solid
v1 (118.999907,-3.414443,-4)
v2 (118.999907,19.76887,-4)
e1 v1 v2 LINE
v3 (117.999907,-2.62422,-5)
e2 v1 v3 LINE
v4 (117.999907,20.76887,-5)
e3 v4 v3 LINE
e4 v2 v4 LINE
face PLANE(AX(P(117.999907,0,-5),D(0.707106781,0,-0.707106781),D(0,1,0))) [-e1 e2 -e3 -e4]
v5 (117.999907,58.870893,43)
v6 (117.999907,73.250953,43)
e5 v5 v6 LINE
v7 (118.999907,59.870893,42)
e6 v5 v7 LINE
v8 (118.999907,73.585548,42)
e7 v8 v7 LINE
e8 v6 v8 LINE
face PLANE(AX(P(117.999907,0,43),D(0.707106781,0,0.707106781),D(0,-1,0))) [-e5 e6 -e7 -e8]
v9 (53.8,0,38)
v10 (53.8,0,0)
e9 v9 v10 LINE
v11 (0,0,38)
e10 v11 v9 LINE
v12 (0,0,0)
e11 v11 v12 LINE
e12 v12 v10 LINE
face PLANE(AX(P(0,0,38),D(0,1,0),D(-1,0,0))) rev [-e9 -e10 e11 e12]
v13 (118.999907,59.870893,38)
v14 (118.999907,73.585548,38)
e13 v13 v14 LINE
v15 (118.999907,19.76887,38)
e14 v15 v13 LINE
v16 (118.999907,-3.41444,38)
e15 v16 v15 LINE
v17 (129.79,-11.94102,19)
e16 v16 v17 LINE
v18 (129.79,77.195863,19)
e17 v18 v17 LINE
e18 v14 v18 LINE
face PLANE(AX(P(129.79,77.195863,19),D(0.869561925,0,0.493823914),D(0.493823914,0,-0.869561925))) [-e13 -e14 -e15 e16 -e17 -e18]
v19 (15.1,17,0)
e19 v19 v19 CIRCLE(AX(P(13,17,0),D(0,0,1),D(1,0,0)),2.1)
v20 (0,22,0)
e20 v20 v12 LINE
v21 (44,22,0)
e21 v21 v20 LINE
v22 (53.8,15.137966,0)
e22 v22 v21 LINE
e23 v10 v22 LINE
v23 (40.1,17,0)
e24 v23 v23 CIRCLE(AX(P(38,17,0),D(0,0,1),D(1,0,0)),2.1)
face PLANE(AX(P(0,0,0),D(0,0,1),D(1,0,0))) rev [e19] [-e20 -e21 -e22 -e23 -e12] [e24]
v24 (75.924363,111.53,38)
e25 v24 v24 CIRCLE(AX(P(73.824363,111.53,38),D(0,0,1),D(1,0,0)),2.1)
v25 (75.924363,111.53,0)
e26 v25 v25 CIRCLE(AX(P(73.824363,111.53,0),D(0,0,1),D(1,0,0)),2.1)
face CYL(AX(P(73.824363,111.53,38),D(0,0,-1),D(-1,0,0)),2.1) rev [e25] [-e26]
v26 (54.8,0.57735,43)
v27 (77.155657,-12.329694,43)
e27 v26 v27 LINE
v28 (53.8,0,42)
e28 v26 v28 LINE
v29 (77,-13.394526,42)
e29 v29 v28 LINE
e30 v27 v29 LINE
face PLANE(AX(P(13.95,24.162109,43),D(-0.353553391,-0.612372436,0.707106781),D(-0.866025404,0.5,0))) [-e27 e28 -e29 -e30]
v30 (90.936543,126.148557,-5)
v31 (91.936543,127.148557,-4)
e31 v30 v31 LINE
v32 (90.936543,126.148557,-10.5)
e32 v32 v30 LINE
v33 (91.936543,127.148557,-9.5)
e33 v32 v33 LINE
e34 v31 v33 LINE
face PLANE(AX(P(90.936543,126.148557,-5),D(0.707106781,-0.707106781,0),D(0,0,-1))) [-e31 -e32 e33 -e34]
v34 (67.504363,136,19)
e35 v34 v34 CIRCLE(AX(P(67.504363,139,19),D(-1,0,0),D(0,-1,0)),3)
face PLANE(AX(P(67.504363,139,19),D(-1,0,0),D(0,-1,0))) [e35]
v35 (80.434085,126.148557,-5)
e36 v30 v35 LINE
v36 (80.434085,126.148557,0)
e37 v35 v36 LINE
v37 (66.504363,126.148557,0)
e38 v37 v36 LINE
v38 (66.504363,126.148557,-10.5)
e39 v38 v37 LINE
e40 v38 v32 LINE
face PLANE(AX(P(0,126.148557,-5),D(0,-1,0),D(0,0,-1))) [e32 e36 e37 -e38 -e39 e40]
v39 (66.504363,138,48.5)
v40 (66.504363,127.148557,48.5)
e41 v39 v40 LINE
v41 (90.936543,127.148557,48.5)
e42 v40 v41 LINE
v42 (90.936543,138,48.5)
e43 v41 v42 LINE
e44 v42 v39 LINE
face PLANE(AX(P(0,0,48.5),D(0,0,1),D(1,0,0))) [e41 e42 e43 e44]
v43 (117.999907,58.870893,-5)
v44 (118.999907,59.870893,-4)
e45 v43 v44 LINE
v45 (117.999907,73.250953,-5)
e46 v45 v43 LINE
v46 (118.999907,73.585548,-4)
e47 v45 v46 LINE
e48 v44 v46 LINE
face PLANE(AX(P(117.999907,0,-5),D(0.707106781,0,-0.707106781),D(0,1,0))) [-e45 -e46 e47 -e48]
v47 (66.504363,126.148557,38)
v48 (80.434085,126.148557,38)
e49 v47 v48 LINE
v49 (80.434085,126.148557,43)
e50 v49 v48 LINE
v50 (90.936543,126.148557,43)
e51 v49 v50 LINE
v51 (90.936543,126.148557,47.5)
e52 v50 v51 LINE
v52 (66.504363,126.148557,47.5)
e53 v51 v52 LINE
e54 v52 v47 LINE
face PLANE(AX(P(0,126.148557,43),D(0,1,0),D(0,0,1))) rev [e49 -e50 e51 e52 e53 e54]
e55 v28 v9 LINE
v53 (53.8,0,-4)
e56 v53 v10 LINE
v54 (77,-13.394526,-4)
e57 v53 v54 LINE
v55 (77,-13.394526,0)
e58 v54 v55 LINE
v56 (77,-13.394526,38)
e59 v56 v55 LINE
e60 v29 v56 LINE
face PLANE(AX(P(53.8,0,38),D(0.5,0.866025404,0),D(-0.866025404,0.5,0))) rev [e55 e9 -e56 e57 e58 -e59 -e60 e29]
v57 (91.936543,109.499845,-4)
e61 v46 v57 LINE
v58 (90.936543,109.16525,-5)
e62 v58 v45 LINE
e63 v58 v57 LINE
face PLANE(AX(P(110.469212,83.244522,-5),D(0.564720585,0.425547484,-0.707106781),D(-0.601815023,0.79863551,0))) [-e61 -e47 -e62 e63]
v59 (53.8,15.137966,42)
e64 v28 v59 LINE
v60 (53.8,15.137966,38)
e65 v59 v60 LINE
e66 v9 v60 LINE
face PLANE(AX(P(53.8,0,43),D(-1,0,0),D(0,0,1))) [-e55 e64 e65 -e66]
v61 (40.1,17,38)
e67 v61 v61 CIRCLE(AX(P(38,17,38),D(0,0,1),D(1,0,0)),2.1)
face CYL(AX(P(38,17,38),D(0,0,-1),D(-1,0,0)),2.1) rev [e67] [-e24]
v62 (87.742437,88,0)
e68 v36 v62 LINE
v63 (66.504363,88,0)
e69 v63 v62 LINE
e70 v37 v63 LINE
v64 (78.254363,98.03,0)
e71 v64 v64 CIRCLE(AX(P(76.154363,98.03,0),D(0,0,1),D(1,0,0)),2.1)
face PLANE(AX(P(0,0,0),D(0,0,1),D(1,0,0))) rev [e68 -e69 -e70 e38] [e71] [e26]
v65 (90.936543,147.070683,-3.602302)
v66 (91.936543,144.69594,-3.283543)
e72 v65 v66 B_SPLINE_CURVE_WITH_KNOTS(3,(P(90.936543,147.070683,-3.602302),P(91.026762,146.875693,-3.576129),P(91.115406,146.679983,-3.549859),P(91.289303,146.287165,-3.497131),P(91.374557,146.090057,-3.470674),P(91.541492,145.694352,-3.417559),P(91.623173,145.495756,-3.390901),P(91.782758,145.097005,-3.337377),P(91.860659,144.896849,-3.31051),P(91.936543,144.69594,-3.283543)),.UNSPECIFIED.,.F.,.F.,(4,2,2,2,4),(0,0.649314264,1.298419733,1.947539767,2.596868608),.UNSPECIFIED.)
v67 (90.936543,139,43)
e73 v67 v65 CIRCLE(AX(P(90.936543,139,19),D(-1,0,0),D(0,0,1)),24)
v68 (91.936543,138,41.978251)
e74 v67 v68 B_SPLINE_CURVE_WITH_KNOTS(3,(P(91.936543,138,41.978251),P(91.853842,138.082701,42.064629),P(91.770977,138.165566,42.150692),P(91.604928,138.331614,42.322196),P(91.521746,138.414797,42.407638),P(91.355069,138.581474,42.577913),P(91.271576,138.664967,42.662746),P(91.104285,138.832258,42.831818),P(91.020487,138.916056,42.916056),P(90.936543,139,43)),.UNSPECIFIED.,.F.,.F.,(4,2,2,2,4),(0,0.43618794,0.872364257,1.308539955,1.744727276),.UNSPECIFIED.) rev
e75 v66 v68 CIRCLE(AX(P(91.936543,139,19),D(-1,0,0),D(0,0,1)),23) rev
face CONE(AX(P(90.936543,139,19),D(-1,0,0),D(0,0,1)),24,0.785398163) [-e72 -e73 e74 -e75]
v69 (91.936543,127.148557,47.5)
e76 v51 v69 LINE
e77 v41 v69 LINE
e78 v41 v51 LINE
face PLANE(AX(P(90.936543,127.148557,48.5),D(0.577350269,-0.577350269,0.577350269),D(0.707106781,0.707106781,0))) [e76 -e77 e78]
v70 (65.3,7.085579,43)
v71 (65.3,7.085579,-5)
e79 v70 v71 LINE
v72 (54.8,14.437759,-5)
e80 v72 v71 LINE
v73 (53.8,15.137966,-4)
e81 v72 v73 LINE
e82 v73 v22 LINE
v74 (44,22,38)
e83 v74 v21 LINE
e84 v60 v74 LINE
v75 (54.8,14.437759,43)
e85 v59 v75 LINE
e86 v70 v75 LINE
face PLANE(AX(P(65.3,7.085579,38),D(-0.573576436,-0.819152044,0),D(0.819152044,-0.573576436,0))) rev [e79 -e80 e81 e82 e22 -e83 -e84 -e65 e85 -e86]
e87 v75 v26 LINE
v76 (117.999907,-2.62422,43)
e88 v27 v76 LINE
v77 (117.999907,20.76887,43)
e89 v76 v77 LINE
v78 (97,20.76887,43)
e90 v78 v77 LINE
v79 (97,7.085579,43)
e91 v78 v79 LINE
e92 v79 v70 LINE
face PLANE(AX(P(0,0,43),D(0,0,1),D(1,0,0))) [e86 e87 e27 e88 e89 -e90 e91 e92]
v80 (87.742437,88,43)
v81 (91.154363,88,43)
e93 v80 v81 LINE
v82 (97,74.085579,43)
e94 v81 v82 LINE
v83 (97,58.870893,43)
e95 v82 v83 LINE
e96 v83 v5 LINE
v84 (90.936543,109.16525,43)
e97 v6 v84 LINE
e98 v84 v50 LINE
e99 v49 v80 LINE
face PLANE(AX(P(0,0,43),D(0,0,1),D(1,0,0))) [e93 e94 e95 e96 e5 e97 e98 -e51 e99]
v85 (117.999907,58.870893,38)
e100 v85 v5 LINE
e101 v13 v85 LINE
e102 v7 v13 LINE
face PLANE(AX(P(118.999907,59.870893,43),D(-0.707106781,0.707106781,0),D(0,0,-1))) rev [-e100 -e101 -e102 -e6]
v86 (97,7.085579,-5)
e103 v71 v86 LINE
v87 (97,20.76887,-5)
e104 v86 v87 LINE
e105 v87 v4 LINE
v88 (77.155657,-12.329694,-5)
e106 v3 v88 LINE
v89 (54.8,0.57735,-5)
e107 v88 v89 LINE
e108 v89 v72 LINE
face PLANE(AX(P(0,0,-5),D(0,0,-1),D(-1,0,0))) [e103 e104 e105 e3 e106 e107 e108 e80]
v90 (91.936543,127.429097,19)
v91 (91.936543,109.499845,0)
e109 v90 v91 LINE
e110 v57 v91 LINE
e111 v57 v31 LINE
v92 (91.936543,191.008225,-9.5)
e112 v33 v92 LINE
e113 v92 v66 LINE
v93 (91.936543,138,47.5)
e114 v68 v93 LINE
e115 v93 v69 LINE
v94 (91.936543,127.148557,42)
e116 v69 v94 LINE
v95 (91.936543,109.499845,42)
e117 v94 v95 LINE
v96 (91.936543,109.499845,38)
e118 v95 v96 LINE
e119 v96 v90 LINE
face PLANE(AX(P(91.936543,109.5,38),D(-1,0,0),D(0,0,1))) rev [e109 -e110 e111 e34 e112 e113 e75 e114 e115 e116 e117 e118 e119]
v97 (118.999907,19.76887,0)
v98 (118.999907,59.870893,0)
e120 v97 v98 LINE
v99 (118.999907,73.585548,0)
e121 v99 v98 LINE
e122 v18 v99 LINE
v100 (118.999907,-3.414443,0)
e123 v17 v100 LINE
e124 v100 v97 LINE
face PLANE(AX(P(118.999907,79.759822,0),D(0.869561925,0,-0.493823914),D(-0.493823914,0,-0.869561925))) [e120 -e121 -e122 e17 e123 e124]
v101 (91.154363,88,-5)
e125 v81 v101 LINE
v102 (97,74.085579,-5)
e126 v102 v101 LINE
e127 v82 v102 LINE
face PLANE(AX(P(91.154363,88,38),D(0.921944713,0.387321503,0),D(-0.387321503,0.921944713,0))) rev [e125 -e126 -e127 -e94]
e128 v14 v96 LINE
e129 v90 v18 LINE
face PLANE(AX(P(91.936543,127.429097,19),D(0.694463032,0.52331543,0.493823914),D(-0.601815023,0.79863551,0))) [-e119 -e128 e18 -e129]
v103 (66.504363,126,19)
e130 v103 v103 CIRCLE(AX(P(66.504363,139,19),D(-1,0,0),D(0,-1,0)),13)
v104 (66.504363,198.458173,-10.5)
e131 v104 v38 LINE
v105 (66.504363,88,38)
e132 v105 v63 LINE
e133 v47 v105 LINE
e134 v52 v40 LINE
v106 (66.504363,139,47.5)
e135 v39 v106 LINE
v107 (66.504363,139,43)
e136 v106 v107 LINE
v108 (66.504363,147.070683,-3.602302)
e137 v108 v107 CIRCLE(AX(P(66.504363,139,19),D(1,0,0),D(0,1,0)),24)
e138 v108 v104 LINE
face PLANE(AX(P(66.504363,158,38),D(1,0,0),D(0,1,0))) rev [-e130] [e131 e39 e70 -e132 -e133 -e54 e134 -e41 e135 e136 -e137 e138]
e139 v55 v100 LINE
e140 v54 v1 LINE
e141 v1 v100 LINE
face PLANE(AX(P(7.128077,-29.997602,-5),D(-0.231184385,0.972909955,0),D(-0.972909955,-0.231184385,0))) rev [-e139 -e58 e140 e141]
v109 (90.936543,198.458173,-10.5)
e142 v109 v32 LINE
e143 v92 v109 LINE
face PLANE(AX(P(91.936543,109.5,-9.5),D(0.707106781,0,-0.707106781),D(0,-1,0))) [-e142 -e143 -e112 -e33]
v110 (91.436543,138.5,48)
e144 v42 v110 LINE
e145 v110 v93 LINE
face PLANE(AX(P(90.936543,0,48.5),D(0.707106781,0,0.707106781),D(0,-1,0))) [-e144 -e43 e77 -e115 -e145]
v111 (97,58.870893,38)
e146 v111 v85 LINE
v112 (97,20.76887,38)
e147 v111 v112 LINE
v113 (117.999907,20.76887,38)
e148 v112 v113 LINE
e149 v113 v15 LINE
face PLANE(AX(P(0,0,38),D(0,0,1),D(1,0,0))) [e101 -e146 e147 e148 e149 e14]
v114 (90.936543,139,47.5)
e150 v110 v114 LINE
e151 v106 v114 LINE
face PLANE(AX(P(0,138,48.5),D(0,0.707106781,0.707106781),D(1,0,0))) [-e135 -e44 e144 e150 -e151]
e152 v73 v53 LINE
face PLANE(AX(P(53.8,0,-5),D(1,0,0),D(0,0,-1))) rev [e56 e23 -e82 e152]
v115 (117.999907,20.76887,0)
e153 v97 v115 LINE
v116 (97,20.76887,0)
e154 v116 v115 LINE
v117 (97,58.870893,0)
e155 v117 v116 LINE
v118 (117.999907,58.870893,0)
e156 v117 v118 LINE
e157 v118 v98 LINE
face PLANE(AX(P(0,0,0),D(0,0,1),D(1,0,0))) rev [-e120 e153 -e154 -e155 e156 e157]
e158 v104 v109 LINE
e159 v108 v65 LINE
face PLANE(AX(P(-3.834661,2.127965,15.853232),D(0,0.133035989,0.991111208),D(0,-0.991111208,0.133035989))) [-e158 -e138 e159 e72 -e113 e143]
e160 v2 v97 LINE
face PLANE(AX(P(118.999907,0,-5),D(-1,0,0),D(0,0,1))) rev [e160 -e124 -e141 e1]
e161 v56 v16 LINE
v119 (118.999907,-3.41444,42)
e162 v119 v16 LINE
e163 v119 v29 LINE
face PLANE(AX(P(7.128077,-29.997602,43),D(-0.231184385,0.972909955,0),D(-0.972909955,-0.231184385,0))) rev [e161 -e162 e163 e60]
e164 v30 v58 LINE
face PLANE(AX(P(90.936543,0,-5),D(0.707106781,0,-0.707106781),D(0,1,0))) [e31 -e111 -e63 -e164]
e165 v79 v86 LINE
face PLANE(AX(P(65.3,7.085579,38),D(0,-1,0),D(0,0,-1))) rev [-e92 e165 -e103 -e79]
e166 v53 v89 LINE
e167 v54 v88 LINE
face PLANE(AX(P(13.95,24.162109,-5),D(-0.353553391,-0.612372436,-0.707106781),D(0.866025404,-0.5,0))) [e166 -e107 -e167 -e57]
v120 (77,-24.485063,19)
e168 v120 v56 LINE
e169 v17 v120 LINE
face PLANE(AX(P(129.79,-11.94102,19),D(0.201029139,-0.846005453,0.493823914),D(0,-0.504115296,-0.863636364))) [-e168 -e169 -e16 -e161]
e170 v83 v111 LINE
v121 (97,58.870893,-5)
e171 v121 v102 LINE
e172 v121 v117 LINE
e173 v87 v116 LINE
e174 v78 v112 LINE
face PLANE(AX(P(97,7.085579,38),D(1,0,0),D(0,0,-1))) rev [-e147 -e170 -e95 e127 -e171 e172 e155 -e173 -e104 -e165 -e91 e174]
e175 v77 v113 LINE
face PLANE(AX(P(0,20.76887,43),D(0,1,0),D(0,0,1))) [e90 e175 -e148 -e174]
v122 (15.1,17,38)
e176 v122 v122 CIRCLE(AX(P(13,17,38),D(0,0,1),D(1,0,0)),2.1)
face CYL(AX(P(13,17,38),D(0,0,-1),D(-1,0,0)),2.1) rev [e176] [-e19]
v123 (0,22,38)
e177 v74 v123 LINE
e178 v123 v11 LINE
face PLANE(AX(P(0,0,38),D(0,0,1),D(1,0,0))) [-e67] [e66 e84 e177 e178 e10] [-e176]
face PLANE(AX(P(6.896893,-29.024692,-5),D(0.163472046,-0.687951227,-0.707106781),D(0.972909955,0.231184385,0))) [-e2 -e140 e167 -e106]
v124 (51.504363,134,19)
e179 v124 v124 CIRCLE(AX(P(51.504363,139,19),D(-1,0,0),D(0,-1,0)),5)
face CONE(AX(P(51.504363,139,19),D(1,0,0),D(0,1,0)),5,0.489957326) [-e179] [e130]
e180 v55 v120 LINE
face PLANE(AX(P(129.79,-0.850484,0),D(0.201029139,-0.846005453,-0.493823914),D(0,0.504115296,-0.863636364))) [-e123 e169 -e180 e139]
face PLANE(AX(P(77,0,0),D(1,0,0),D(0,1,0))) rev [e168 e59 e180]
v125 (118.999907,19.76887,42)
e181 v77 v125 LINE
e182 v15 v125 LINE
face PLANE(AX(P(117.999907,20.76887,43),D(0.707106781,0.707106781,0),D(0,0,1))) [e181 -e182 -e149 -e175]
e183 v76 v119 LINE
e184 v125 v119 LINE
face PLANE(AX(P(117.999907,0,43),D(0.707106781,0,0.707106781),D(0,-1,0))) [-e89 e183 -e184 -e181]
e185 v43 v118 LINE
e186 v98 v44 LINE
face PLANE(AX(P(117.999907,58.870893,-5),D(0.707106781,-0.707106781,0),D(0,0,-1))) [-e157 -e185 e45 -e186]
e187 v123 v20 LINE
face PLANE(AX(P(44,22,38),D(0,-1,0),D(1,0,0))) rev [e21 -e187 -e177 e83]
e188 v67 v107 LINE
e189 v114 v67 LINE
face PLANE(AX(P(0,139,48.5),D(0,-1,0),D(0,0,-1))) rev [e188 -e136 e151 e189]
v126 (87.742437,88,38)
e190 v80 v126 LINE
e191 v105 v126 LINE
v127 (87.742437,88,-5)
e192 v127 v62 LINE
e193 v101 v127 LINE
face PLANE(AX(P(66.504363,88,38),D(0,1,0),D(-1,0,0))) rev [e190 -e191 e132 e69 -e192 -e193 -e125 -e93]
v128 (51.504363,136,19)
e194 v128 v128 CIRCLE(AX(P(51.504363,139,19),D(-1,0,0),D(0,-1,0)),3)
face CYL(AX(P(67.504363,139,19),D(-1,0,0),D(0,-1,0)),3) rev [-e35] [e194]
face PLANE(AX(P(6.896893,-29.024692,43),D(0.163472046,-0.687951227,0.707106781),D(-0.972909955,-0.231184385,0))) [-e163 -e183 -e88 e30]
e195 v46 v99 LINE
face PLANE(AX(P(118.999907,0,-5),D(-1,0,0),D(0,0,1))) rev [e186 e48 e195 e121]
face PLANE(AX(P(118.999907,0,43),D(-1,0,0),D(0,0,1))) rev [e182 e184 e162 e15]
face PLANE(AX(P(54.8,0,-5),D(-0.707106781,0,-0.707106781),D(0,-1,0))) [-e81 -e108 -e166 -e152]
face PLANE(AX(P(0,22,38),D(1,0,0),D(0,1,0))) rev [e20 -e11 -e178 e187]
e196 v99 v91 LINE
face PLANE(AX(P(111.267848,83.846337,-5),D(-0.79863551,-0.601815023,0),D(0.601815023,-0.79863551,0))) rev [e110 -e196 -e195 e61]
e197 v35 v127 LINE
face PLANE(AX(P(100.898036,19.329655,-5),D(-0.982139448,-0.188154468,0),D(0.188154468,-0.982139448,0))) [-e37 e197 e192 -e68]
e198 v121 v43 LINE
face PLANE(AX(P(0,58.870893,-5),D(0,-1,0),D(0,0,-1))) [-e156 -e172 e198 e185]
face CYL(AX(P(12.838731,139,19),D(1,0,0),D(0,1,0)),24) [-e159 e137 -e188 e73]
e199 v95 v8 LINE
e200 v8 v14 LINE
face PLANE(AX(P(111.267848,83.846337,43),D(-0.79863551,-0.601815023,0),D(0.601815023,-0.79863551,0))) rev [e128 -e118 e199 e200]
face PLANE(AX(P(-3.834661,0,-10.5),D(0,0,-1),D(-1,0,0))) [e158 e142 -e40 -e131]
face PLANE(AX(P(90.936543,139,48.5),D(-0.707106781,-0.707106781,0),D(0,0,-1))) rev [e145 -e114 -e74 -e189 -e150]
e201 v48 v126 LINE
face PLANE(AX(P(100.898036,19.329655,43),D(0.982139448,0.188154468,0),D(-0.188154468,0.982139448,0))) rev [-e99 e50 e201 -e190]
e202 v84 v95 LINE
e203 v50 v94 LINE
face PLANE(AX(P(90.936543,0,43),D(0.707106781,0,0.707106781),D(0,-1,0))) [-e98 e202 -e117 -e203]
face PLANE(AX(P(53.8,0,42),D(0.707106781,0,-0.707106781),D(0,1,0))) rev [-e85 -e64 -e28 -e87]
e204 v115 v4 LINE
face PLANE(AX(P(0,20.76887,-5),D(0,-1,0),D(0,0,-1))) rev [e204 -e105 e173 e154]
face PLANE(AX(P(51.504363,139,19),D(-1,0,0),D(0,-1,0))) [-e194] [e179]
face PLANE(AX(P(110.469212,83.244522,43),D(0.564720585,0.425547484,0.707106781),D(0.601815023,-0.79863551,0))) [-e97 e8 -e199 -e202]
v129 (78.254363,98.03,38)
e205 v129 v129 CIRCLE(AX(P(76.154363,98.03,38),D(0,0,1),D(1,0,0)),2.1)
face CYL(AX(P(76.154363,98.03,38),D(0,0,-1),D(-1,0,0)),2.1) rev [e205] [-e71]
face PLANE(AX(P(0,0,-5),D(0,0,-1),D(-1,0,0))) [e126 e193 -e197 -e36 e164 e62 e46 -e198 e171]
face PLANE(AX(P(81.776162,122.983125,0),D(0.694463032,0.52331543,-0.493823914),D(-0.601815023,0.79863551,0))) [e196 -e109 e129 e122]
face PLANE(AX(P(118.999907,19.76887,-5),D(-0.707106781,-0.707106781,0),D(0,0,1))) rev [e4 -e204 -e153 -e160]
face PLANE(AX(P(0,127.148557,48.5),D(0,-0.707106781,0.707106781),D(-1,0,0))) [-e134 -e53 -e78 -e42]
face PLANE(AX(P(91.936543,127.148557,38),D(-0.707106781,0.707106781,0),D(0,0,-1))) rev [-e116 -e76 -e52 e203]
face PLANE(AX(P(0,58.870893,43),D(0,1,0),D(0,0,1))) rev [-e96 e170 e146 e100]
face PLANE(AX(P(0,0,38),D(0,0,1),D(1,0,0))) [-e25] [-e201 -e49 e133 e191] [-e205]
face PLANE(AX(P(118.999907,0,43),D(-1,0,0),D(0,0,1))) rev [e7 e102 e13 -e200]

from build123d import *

# Parameters (mm, degrees)
SKETCH_1_R          = 2.1
EXTRUDE_1_DEPTH     = 38
CUT_EXTRUDE_1_DEPTH = 187.709206858
SKETCH_3_R          = 3
CUT_EXTRUDE_3_DEPTH = 1
EXTRUDE_2_DEPTH     = 5
EXTRUDE_3_DEPTH     = 5
EXTRUDE_2_2_DEPTH   = 25.432180104
EXTRUDE_7_DEPTH     = 25.432180104
SKETCH_18_W         = 25.432180104
SKETCH_18_H         = 5.5
EXTRUDE_8_DEPTH     = 2.30961622
EXTRUDE_10_DEPTH    = 5.5
SKETCH_21_R         = 5
SKETCH_20_R         = 13
CUT_EXTRUDE_4_REACH = 220.784
SKETCH_23_R         = 3
CHAMFER_1_SIZE      = 1


with BuildPart() as part:
    # 草图1 → 凸台-拉伸1 (new body)
    with BuildSketch(Plane.XY):
        Polygon((0, 0), (53.8, 0), (77, -13.394526245), (119, -3.414420564), (119, 73.585579436), (91.936542927, 109.5), (91.936542927, 158), (66.504362823, 158), (66.504362823, 88), (91.154362823, 88), (97, 74.085579436), (97, 7.085579436), (65.3, 7.085579436), (44, 22), (0, 22), align=None)
        with Locations((73.824362823, 111.53)):
            Circle(SKETCH_1_R, mode=Mode.SUBTRACT)
        with Locations((76.154362823, 98.03)):
            Circle(SKETCH_1_R, mode=Mode.SUBTRACT)
        with Locations((13, 17)):
            Circle(SKETCH_1_R, mode=Mode.SUBTRACT)
        with Locations((38, 17)):
            Circle(SKETCH_1_R, mode=Mode.SUBTRACT)
    extrude(amount=EXTRUDE_1_DEPTH)

    # 草图2 → 切除-拉伸1 (cut, through all)
    with BuildSketch(Plane(origin=(91.936542927, 0, 0), x_dir=(0, 0, -1), z_dir=(1, 0, 0))):
        with BuildLine():
            Line((-38, 158), (-38, 139))
            ThreePointArc((-38, 139), (-32.435028843, 152.435028843), (-19, 158))
            Line((-19, 158), (-38, 158))
        make_face()
        with BuildLine():
            Line((0, 158), (-19, 158))
            ThreePointArc((-19, 158), (-5.564971157, 152.435028843), (0, 139))
            Line((0, 139), (0, 158))
        make_face()
    extrude(amount=-CUT_EXTRUDE_1_DEPTH, mode=Mode.SUBTRACT)

    # 草图3 → 切除-拉伸3 (cut)
    with BuildSketch(Plane.ZY.offset(-66.504362823)):
        with Locations(Location((19, 139, 0), (0, 0, 270))):
            Circle(SKETCH_3_R)
    extrude(amount=-CUT_EXTRUDE_3_DEPTH, mode=Mode.SUBTRACT)

    # 扫描3: sweep along a path in 草图13
    with BuildLine(Plane.XY.offset(19)) as sweep_3_path:
        Line((91.936542927, 127.429097123), (129.79, 77.195862934))
        Line((129.79, 77.195862934), (129.79, -11.941020396))
        Line((129.79, -11.941020396), (77, -24.485062752))
    # 草图4 → 扫描3 (sweep)
    with BuildSketch(Plane.ZY.offset(-77)):
        Polygon((38, -13.394526245), (0, -13.394526245), (19, -24.485062752), align=None)
    sweep(path=sweep_3_path.line, transition=Transition.RIGHT)

    # 草图14 → Extrude 2 (add)
    with BuildSketch(Plane.XY.offset(38)):
        Polygon((66.504362823, 139), (66.504362823, 126.148557267), (80.434084519, 126.148557267), (87.742437222, 88), (91.154362823, 88), (97, 74.085579436), (97, 58.870893274), (118.999906629, 58.870893274), (118.999906629, 73.585548195), (91.936542927, 109.499844851), (91.936542927, 139), align=None)
        Polygon((118.999906629, 20.768869661), (97, 20.768869661), (97, 7.085579436), (65.3, 7.085579436), (53.8, 15.137966126), (53.8, 0), (77, -13.394526245), (118.999906629, -3.414439978), align=None)
    extrude(amount=EXTRUDE_2_DEPTH)

    # 草图15 → 凸台-拉伸3 (add)
    with BuildSketch(Plane(origin=(0, 0, 0), x_dir=(-1, 0, 0), z_dir=(0, 0, -1))):
        Polygon((-118.999906629, 73.585548195), (-118.999906629, 58.870893274), (-97, 58.870893274), (-97, 74.085579436), (-91.154362823, 88), (-87.742437222, 88), (-80.434084519, 126.148557267), (-66.504362823, 126.148557267), (-66.504362823, 139), (-91.936542927, 139), (-91.936542927, 109.499844851), align=None)
        Polygon((-77, -13.394526245), (-53.8, 0), (-53.8, 15.137966126), (-65.3, 7.085579436), (-97, 7.085579436), (-97, 20.768869661), (-118.999906629, 20.768869661), (-118.999906629, -3.414442751), align=None)
    extrude(amount=EXTRUDE_3_DEPTH)

    # 草图16 → Extrude 2 2 (add)
    with BuildSketch(Plane(origin=(91.936542927, 0, 0), x_dir=(0, 0, -1), z_dir=(1, 0, 0))):
        with BuildLine():
            ThreePointArc((-43, 139), (-19, 163), (5, 139))
            Line((5, 139), (-5, 139))
            ThreePointArc((-5, 139), (-19, 153), (-33, 139))
            Line((-33, 139), (-43, 139))
        make_face()
    extrude(amount=-EXTRUDE_2_2_DEPTH)

    # 草图17 → 凸台-拉伸7 (add)
    with BuildSketch(Plane(origin=(91.936542927, 0, 0), x_dir=(0, 0, -1), z_dir=(1, 0, 0))):
        with BuildLine():
            Line((5, 139), (5, 128.458173487))
            Line((5, 128.458173487), (10.5, 128.458173487))
            Line((10.5, 128.458173487), (10.5, 198.458173487))
            Line((10.5, 198.458173487), (3.602302269, 147.070683498))
            ThreePointArc((3.602302269, 147.070683498), (4.647994148, 143.095408742), (5, 139))
        make_face()
    extrude(amount=-EXTRUDE_7_DEPTH)

    # 草图18 → 凸台-拉伸8 (add)
    with BuildSketch(Plane.XZ.offset(-128.458173487)):
        with Locations((79.220452875, -7.75)):
            Rectangle(SKETCH_18_W, SKETCH_18_H)
    extrude(amount=EXTRUDE_8_DEPTH)

    # 草图19 → 凸台-拉伸10 (add)
    with BuildSketch(Plane.XY.offset(43)):
        Polygon((66.504362823, 126.148557267), (80.434084519, 126.148557267), (91.936542927, 126.148557267), (91.936542927, 139), (66.504362823, 139), align=None)
    extrude(amount=EXTRUDE_10_DEPTH)

    # 草图21 → 放样1 section 0
    with BuildSketch(Plane.ZY.offset(-51.504362823)):
        with Locations((19, 139)):
            Circle(SKETCH_21_R)
    # 草图20 → 放样1 section 1
    with BuildSketch(Plane.ZY.offset(-66.504362823)):
        with Locations((19, 139)):
            Circle(SKETCH_20_R)
    loft()

    # 草图23 → 切除-拉伸4 (cut, up to next)
    with BuildSketch(Plane.ZY.offset(-51.504362823), mode=Mode.PRIVATE) as cut_extrude_4_sk1:
        with Locations(Location((19, 139, 0), (0, 0, 270))):
            Circle(SKETCH_23_R)
    cut_extrude_4_tool1 = extrude(cut_extrude_4_sk1.sketch, amount=-CUT_EXTRUDE_4_REACH, mode=Mode.PRIVATE) & part.part
    add(cut_extrude_4_tool1.solids().sort_by_distance((51.504363, 139, 19))[0], mode=Mode.SUBTRACT)

    # 倒角1
    chamfer_1_edges = [part.edges().sort_by_distance(p)[0] for p in [
        (79.220452875, 139, 48.5),
    ]]
    chamfer(chamfer_1_edges, length=CHAMFER_1_SIZE)

    # 倒角3
    # the kernel refuses this chamfer: 1 mm, written as the material it takes off along each edge
    with BuildSketch(Plane(origin=(91.26987626, 126.815223933, 47.833333333), x_dir=(-0.7071067811865475, 0, 0.7071067811865475), z_dir=(0.5773502691896258, -0.5773502691896258, 0.5773502691896258))) as chamfer_3_piece_1:
        Polygon((-0.707106781, -0.40824829), (0.707106781, -0.40824829), (0, 0.816496581), align=None)
    extrude(amount=1.270170592, mode=Mode.SUBTRACT)
    with BuildSketch(Plane(origin=(53.8, 17.709649114, 43), x_dir=(0.9996219169112968, 0, 0.027495876610589005), z_dir=(0, -1, 0)), Plane(origin=(53.8, -2.571682988, -5), x_dir=(0.9996219169112968, 0, -0.027495876610586414), z_dir=(0, 1, 0))) as chamfer_3_piece_2:
        with BuildLine():
            Line((1.028673195, 0), (-0.056547155, -1.027117794))
            Line((-0.056547155, -1.027117794), (-0.076539593, -1.026567876))
            ThreePointArc((-0.076539593, -1.026567876), (-0.034129227, -0.51339783), (-0.019992438, 0.000549918))
            Line((-0.019992438, 0.000549918), (0.000549918, 0.019992438))
            ThreePointArc((0.000549918, 0.019992438), (0.514497665, 0.00585565), (1.029223113, 0.019992438))
            Line((1.029223113, 0.019992438), (1.028673195, 0))
        make_face()
    extrude(amount=20.281332101, mode=Mode.SUBTRACT)
    with BuildSketch(Plane(origin=(118.999906629, 20.768869661, 38), x_dir=(-0.9996219169112968, 0.02749587661058574, 0), z_dir=(0, 0, 1)), Plane(origin=(118.999906629, 58.870893274, 38), x_dir=(0.027495876610582105, 0.999621916911297, 0), z_dir=(0, 0, 1)), Plane(origin=(118.999906629, 58.870893274, 0), x_dir=(-0.9996219169112968, -0.027495876610589196, 0), z_dir=(0, 0, -1))) as chamfer_3_piece_3:
        with BuildLine():
            Line((1.028673195, 0), (-0.056547155, 1.027117794))
            Line((-0.056547155, 1.027117794), (-0.076539593, 1.026567876))
            ThreePointArc((-0.076539593, 1.026567876), (-0.034129227, 0.51339783), (-0.019992438, -0.000549918))
            Line((-0.019992438, -0.000549918), (0.000549918, -0.019992438))
            ThreePointArc((0.000549918, -0.019992438), (0.514497665, -0.00585565), (1.029223113, -0.019992438))
            Line((1.029223113, -0.019992438), (1.028673195, 0))
        make_face()
    extrude(amount=7.571682988, mode=Mode.SUBTRACT)
    with BuildSketch(Plane(origin=(51.572857202, 1.285841494, 43), x_dir=(0.4998109584556499, 0.8656979742248793, 0.027495876610589116), z_dir=(0.8660254037844378, -0.5000000000000017, 0)), Plane(origin=(79.227142798, -14.680367739, -5), x_dir=(0.49981095845565, 0.8656979742248795, -0.027495876610586535), z_dir=(-0.8660254037844378, 0.5000000000000017, 0))) as chamfer_3_piece_4:
        with BuildLine():
            Line((1.028673195, 0), (-0.056547155, -1.027117794))
            Line((-0.056547155, -1.027117794), (-0.076539593, -1.026567876))
            ThreePointArc((-0.076539593, -1.026567876), (-0.034129227, -0.51339783), (-0.019992438, 0.000549918))
            Line((-0.019992438, 0.000549918), (0.000549918, 0.019992438))
            ThreePointArc((0.000549918, 0.019992438), (0.514497665, 0.00585565), (1.029223113, 0.019992438))
            Line((1.029223113, 0.019992438), (1.028673195, 0))
        make_face()
    extrude(amount=31.932418466, mode=Mode.SUBTRACT)
    with BuildSketch(Plane(origin=(74.497984058, -13.989059351, 43), x_dir=(0.006356618994580412, -0.0267510116732474, -0.9996219169112968), z_dir=(0.9729099403562855, 0.23118444574825722, 0))) as chamfer_3_piece_5:
        with BuildLine():
            Line((1.028673195, 0), (-0.056547155, 1.027117794))
            Line((-0.056547155, 1.027117794), (-0.076539593, 1.026567876))
            ThreePointArc((-0.076539593, 1.026567876), (-0.034129227, 0.51339783), (-0.019992438, -0.000549918))
            Line((-0.019992438, -0.000549918), (0.000549918, -0.019992438))
            ThreePointArc((0.000549918, -0.019992438), (0.514497665, -0.00585565), (1.029223113, -0.019992438))
            Line((1.029223113, -0.019992438), (1.028673195, 0))
        make_face()
    extrude(amount=48.312733341, mode=Mode.SUBTRACT)
    with BuildSketch(Plane(origin=(118.999906629, -5.986122965, 43), x_dir=(0.027495876610582105, 0, -0.999621916911297), z_dir=(0, 1, 0))) as chamfer_3_piece_6:
        with BuildLine():
            Line((1.028673195, 0), (-0.056547155, 1.027117794))
            Line((-0.056547155, 1.027117794), (-0.076539593, 1.026567876))
            ThreePointArc((-0.076539593, 1.026567876), (-0.034129227, 0.51339783), (-0.019992438, -0.000549918))
            Line((-0.019992438, -0.000549918), (0.000549918, -0.019992438))
            ThreePointArc((0.000549918, -0.019992438), (0.514497665, -0.00585565), (1.029223113, -0.019992438))
            Line((1.029223113, -0.019992438), (1.028673195, 0))
        make_face()
    extrude(amount=29.326675615, mode=Mode.SUBTRACT)
    with BuildSketch(Plane(origin=(118.999906629, 56.299210286, 43), x_dir=(-0.9996219169112968, 0, 0.027495876610589196), z_dir=(0, 1, 0)), Plane(origin=(118.999906629, 76.157231183, -5), x_dir=(-0.9996219169112968, 0, -0.027495876610586605), z_dir=(0, -1, 0))) as chamfer_3_piece_7:
        with BuildLine():
            Line((1.028673195, 0), (-0.056547155, -1.027117794))
            Line((-0.056547155, -1.027117794), (-0.076539593, -1.026567876))
            ThreePointArc((-0.076539593, -1.026567876), (-0.034129227, -0.51339783), (-0.019992438, 0.000549918))
            Line((-0.019992438, 0.000549918), (0.000549918, 0.019992438))
            ThreePointArc((0.000549918, 0.019992438), (0.514497665, 0.00585565), (1.029223113, 0.019992438))
            Line((1.029223113, 0.019992438), (1.028673195, 0))
        make_face()
    extrude(amount=19.858020896, mode=Mode.SUBTRACT)
    with BuildSketch(Plane(origin=(120.547584086, 71.53171084, 43), x_dir=(-0.7983335594669047, -0.6015874870692686, 0.027495876610589096), z_dir=(-0.60181502315205, 0.7986355100472916, 0))) as chamfer_3_piece_8_section:
        with BuildLine():
            Line((1.028673195, 0), (-0.056547155, -1.027117794))
            Line((-0.056547155, -1.027117794), (-0.076539593, -1.026567876))
            ThreePointArc((-0.076539593, -1.026567876), (-0.034129227, -0.51339783), (-0.019992438, 0.000549918))
            Line((-0.019992438, 0.000549918), (0.000549918, 0.019992438))
            ThreePointArc((0.000549918, 0.019992438), (0.514497665, 0.00585565), (1.029223113, 0.019992438))
            Line((1.029223113, 0.019992438), (1.028673195, 0))
        make_face()
    chamfer_3_piece_8 = extrude(amount=50.112937457, mode=Mode.PRIVATE)
    chamfer_3_piece_8 = split(chamfer_3_piece_8, bisect_by=Plane(origin=(91.936542927, 90.144566019, 42.669249939), z_dir=(1, 0, 0)), keep=Keep.TOP, mode=Mode.PRIVATE)
    add(chamfer_3_piece_8, mode=Mode.SUBTRACT)
    with BuildSketch(Plane(origin=(91.936542927, 106.928161863, 43), x_dir=(0.027495876610582105, 0, -0.999621916911297), z_dir=(0, 1, 0))) as chamfer_3_piece_9_section:
        with BuildLine():
            Line((1.028673195, 0), (-0.056547155, 1.027117794))
            Line((-0.056547155, 1.027117794), (-0.076539593, 1.026567876))
            ThreePointArc((-0.076539593, 1.026567876), (-0.034129227, 0.51339783), (-0.019992438, -0.000549918))
            Line((-0.019992438, -0.000549918), (0.000549918, -0.019992438))
            ThreePointArc((0.000549918, -0.019992438), (0.514497665, -0.00585565), (1.029223113, -0.019992438))
            Line((1.029223113, -0.019992438), (1.028673195, 0))
        make_face()
    chamfer_3_piece_9 = extrude(amount=19.220395404, mode=Mode.PRIVATE)
    chamfer_3_piece_9 = split(chamfer_3_piece_9, bisect_by=Plane(origin=(87.71452173, 115.102656217, 42.667427315), z_dir=(0.7986355100472916, 0.60181502315205, 0)), keep=Keep.TOP, mode=Mode.PRIVATE)
    add(chamfer_3_piece_9, mode=Mode.SUBTRACT)
    with BuildSketch(Plane(origin=(90.38886547, 111.553682205, -5), x_dir=(-0.7983335594669051, -0.6015874870692681, -0.027495876610586504), z_dir=(0.6018150231520495, -0.7986355100472919, 0))) as chamfer_3_piece_10_section:
        with BuildLine():
            Line((1.028673195, 0), (-0.056547155, -1.027117794))
            Line((-0.056547155, -1.027117794), (-0.076539593, -1.026567876))
            ThreePointArc((-0.076539593, -1.026567876), (-0.034129227, -0.51339783), (-0.019992438, 0.000549918))
            Line((-0.019992438, 0.000549918), (0.000549918, 0.019992438))
            ThreePointArc((0.000549918, 0.019992438), (0.514497665, 0.00585565), (1.029223113, 0.019992438))
            Line((1.029223113, 0.019992438), (1.028673195, 0))
        make_face()
    chamfer_3_piece_10 = extrude(amount=50.112937457, mode=Mode.PRIVATE)
    chamfer_3_piece_10 = split(chamfer_3_piece_10, bisect_by=Plane(origin=(91.936542927, 90.144566019, -4.669249939), z_dir=(1, 0, 0)), keep=Keep.TOP, mode=Mode.PRIVATE)
    add(chamfer_3_piece_10, mode=Mode.SUBTRACT)
    with BuildSketch(Plane(origin=(118.999906629, 20.768869661, 0), x_dir=(-0.9996219169112968, 0.02749587661058574, 0), z_dir=(0, 0, -1))) as chamfer_3_piece_11:
        with BuildLine():
            Line((1.028673195, 0), (-0.056547155, -1.027117794))
            Line((-0.056547155, -1.027117794), (-0.076539593, -1.026567876))
            ThreePointArc((-0.076539593, -1.026567876), (-0.034129227, -0.51339783), (-0.019992438, 0.000549918))
            Line((-0.019992438, 0.000549918), (0.000549918, 0.019992438))
            ThreePointArc((0.000549918, 0.019992438), (0.514497665, 0.00585565), (1.029223113, 0.019992438))
            Line((1.029223113, 0.019992438), (1.028673195, 0))
        make_face()
    extrude(amount=7.571682988, mode=Mode.SUBTRACT)
    with BuildSketch(Plane(origin=(118.999906629, 23.340552649, -5), x_dir=(0.02749587661058217, 0, 0.9996219169112968), z_dir=(0, -1, 0))) as chamfer_3_piece_12:
        with BuildLine():
            Line((1.028673195, 0), (-0.056547155, 1.027117794))
            Line((-0.056547155, 1.027117794), (-0.076539593, 1.026567876))
            ThreePointArc((-0.076539593, 1.026567876), (-0.034129227, 0.51339783), (-0.019992438, -0.000549918))
            Line((-0.019992438, -0.000549918), (0.000549918, -0.019992438))
            ThreePointArc((0.000549918, -0.019992438), (0.514497665, -0.00585565), (1.029223113, -0.019992438))
            Line((1.029223113, -0.019992438), (1.028673195, 0))
        make_face()
    extrude(amount=29.326678388, mode=Mode.SUBTRACT)
    with BuildSketch(Plane(origin=(121.501922608, -2.819909801, -5), x_dir=(-0.2310969780314448, 0.9725421140054292, -0.027495876610586514), z_dir=(-0.9729099548061726, -0.231184384937762, 0))) as chamfer_3_piece_13:
        with BuildLine():
            Line((1.028673195, 0), (-0.056547155, -1.027117794))
            Line((-0.056547155, -1.027117794), (-0.076539593, -1.026567876))
            ThreePointArc((-0.076539593, -1.026567876), (-0.034129227, -0.51339783), (-0.019992438, 0.000549918))
            Line((-0.019992438, 0.000549918), (0.000549918, 0.019992438))
            ThreePointArc((0.000549918, 0.019992438), (0.514497665, 0.00585565), (1.029223113, 0.019992438))
            Line((1.029223113, 0.019992438), (1.028673195, 0))
        make_face()
    extrude(amount=48.3127327, mode=Mode.SUBTRACT)
    with BuildSketch(Plane(origin=(91.936542927, 139, 19), x_dir=(0, 0, 1), z_dir=(0, -1, 0))) as chamfer_3_piece_14_section:
        with BuildLine():
            Line((22.971715729, -0.028284271), (24.028284271, 1.028284271))
            Line((24.028284271, 1.028284271), (24.048284271, 1.028284271))
            ThreePointArc((24.048284271, 1.028284271), (24.02, 0.514142136), (24.02, 0))
            Line((24.02, 0), (24, -0.02))
            ThreePointArc((24, -0.02), (23.485857864, -0.02), (22.971715729, -0.048284271))
            Line((22.971715729, -0.048284271), (22.971715729, -0.028284271))
        make_face()
    chamfer_3_piece_14 = revolve(axis=Axis((91.936542927, 139, 19), (-1, 0, 0)), revolution_arc=166.496974045, mode=Mode.PRIVATE)
    chamfer_3_piece_14 = split(chamfer_3_piece_14, bisect_by=Plane(origin=(91.460066415, 158.711193826, -5.164797766), z_dir=(0, 0.13303598850024104, 0.9911112075664182)), keep=Keep.TOP, mode=Mode.PRIVATE)
    add(chamfer_3_piece_14, mode=Mode.SUBTRACT)
    with BuildSketch(Plane(origin=(91.936542927, 123.576874279, -10.5), x_dir=(0.0274958766105822, 0, 0.999621916911297), z_dir=(0, 1, 0))) as chamfer_3_piece_15:
        with BuildLine():
            Line((1.028673195, 0), (-0.056547155, -1.027117794))
            Line((-0.056547155, -1.027117794), (-0.076539593, -1.026567876))
            ThreePointArc((-0.076539593, -1.026567876), (-0.034129227, -0.51339783), (-0.019992438, 0.000549918))
            Line((-0.019992438, 0.000549918), (0.000549918, 0.019992438))
            ThreePointArc((0.000549918, 0.019992438), (0.514497665, 0.00585565), (1.029223113, 0.019992438))
            Line((1.029223113, 0.019992438), (1.028673195, 0))
        make_face()
    extrude(amount=77.452982196, mode=Mode.SUBTRACT)
    with BuildSketch(Plane(origin=(91.936542927, 126.148557267, -5), x_dir=(0.02749587661058217, 0, 0.9996219169112968), z_dir=(0, -1, 0))) as chamfer_3_piece_16_section:
        with BuildLine():
            Line((1.028673195, 0), (-0.056547155, 1.027117794))
            Line((-0.056547155, 1.027117794), (-0.076539593, 1.026567876))
            ThreePointArc((-0.076539593, 1.026567876), (-0.034129227, 0.51339783), (-0.019992438, -0.000549918))
            Line((-0.019992438, -0.000549918), (0.000549918, -0.019992438))
            ThreePointArc((0.000549918, -0.019992438), (0.514497665, -0.00585565), (1.029223113, -0.019992438))
            Line((1.029223113, -0.019992438), (1.028673195, 0))
        make_face()
    chamfer_3_piece_16 = extrude(amount=19.220395404, mode=Mode.PRIVATE)
    chamfer_3_piece_16 = split(chamfer_3_piece_16, bisect_by=Plane(origin=(87.71452173, 115.102656217, -4.667427315), z_dir=(0.7986355100472919, 0.6018150231520495, 0)), keep=Keep.TOP, mode=Mode.PRIVATE)
    add(chamfer_3_piece_16, mode=Mode.SUBTRACT)
    with BuildSketch(Plane(origin=(91.936542927, 126.148557267, -13.071682988), x_dir=(0.02749587661058229, 0.9996219169112968, 0), z_dir=(0, 0, 1)), Plane(origin=(91.936542927, 126.148557267, 43), x_dir=(0.02749587661058229, 0.9996219169112968, 0), z_dir=(0, 0, 1))) as chamfer_3_piece_17:
        with BuildLine():
            Line((1.028673195, 0), (-0.056547155, 1.027117794))
            Line((-0.056547155, 1.027117794), (-0.076539593, 1.026567876))
            ThreePointArc((-0.076539593, 1.026567876), (-0.034129227, 0.51339783), (-0.019992438, -0.000549918))
            Line((-0.019992438, -0.000549918), (0.000549918, -0.019992438))
            ThreePointArc((0.000549918, -0.019992438), (0.514497665, -0.00585565), (1.029223113, -0.019992438))
            Line((1.029223113, -0.019992438), (1.028673195, 0))
        make_face()
    extrude(amount=8.071682988, mode=Mode.SUBTRACT)
    with BuildSketch(Plane(origin=(94.508225915, 126.148557267, 48.5), x_dir=(0, 0.9996219169112968, 0.027495876610589196), z_dir=(-1, 0, 0))) as chamfer_3_piece_18:
        with BuildLine():
            Line((1.028673195, 0), (-0.056547155, 1.027117794))
            Line((-0.056547155, 1.027117794), (-0.076539593, 1.026567876))
            ThreePointArc((-0.076539593, 1.026567876), (-0.034129227, 0.51339783), (-0.019992438, -0.000549918))
            Line((-0.019992438, -0.000549918), (0.000549918, -0.019992438))
            ThreePointArc((0.000549918, -0.019992438), (0.514497665, -0.00585565), (1.029223113, -0.019992438))
            Line((1.029223113, -0.019992438), (1.028673195, 0))
        make_face()
    extrude(amount=30.575546079, mode=Mode.SUBTRACT)
    with BuildSketch(Plane(origin=(91.936542927, 123.576874279, 48.5), x_dir=(0.027495876610582105, 0, -0.999621916911297), z_dir=(0, 1, 0))) as chamfer_3_piece_19:
        with BuildLine():
            Line((1.028673195, 0), (-0.056547155, 1.027117794))
            Line((-0.056547155, 1.027117794), (-0.076539593, 1.026567876))
            ThreePointArc((-0.076539593, 1.026567876), (-0.034129227, 0.51339783), (-0.019992438, -0.000549918))
            Line((-0.019992438, -0.000549918), (0.000549918, -0.019992438))
            ThreePointArc((0.000549918, -0.019992438), (0.514497665, -0.00585565), (1.029223113, -0.019992438))
            Line((1.029223113, -0.019992438), (1.028673195, 0))
        make_face()
    extrude(amount=16.994808709, mode=Mode.SUBTRACT)
    with BuildSketch(Plane(origin=(91.936542927, 139, 40.428317012), x_dir=(-0.999621916911297, 0.027495876610582292, 0), z_dir=(0, 0, 1))) as chamfer_3_piece_20_section:
        with BuildLine():
            Line((1.028673195, 0), (-0.056547155, 1.027117794))
            Line((-0.056547155, 1.027117794), (-0.076539593, 1.026567876))
            ThreePointArc((-0.076539593, 1.026567876), (-0.034129227, 0.51339783), (-0.019992438, -0.000549918))
            Line((-0.019992438, -0.000549918), (0.000549918, -0.019992438))
            ThreePointArc((0.000549918, -0.019992438), (0.514497665, -0.00585565), (1.029223113, -0.019992438))
            Line((1.029223113, -0.019992438), (1.028673195, 0))
        make_face()
    chamfer_3_piece_20 = extrude(amount=9.643365976, mode=Mode.PRIVATE)
    chamfer_3_piece_20 = chamfer_3_piece_20 - Plane(origin=(91.606828487, 139, 19), x_dir=(0, 0, 1), z_dir=(1, 0, 0)) * Cylinder(24, 24, mode=Mode.PRIVATE)
    add(chamfer_3_piece_20, mode=Mode.SUBTRACT)
    with BuildSketch(Plane(origin=(91.936542927, 106.928161863, 43), x_dir=(0.027495876610582105, 0, -0.999621916911297), z_dir=(0, 1, 0))) as chamfer_3_piece_21a_section:
        with BuildLine():
            Line((1.028673195, 0), (-0.056547155, 1.027117794))
            Line((-0.056547155, 1.027117794), (-0.076539593, 1.026567876))
            ThreePointArc((-0.076539593, 1.026567876), (-0.034129227, 0.51339783), (-0.019992438, -0.000549918))
            Line((-0.019992438, -0.000549918), (0.000549918, -0.019992438))
            ThreePointArc((0.000549918, -0.019992438), (0.514497665, -0.00585565), (1.029223113, -0.019992438))
            Line((1.029223113, -0.019992438), (1.028673195, 0))
        make_face()
    chamfer_3_piece_21a = extrude(amount=19.220395404, mode=Mode.PRIVATE)
    chamfer_3_piece_21a = split(chamfer_3_piece_21a, bisect_by=Plane(origin=(92.310865996, 109.003101361, 42.685176958), z_dir=(-0.7986355100472916, -0.60181502315205, 0)), keep=Keep.TOP, mode=Mode.PRIVATE)
    with BuildSketch(Plane(origin=(120.547584086, 71.53171084, 43), x_dir=(-0.7983335594669047, -0.6015874870692686, 0.027495876610589096), z_dir=(-0.60181502315205, 0.7986355100472916, 0))) as chamfer_3_piece_21b_section:
        with BuildLine():
            Line((1.028673195, 0), (-0.056547155, -1.027117794))
            Line((-0.056547155, -1.027117794), (-0.076539593, -1.026567876))
            ThreePointArc((-0.076539593, -1.026567876), (-0.034129227, -0.51339783), (-0.019992438, 0.000549918))
            Line((-0.019992438, 0.000549918), (0.000549918, 0.019992438))
            ThreePointArc((0.000549918, 0.019992438), (0.514497665, 0.00585565), (1.029223113, 0.019992438))
            Line((1.029223113, 0.019992438), (1.028673195, 0))
        make_face()
    chamfer_3_piece_21b = extrude(amount=50.112937457, mode=Mode.PRIVATE)
    chamfer_3_piece_21b = split(chamfer_3_piece_21b, bisect_by=Plane(origin=(91.936542927, 110.121835087, 42.685176958), z_dir=(-1, 0, 0)), keep=Keep.TOP, mode=Mode.PRIVATE)
    chamfer_3_piece_21 = chamfer_3_piece_21a & chamfer_3_piece_21b
    add(chamfer_3_piece_21, mode=Mode.SUBTRACT)
    with BuildSketch(Plane(origin=(91.936542927, 126.148557267, 40.428317012), x_dir=(0.02749587661058229, 0.9996219169112968, 0), z_dir=(0, 0, 1))) as chamfer_3_piece_22a_section:
        with BuildLine():
            Line((1.028673195, 0), (-0.056547155, 1.027117794))
            Line((-0.056547155, 1.027117794), (-0.076539593, 1.026567876))
            ThreePointArc((-0.076539593, 1.026567876), (-0.034129227, 0.51339783), (-0.019992438, -0.000549918))
            Line((-0.019992438, -0.000549918), (0.000549918, -0.019992438))
            ThreePointArc((0.000549918, -0.019992438), (0.514497665, -0.00585565), (1.029223113, -0.019992438))
            Line((1.029223113, -0.019992438), (1.028673195, 0))
        make_face()
    chamfer_3_piece_22a = extrude(amount=10.643365976, mode=Mode.PRIVATE)
    chamfer_3_piece_22a = split(chamfer_3_piece_22a, bisect_by=Plane(origin=(91.6067493, 126.478350894, 43), z_dir=(0, 0, -1)), keep=Keep.TOP, mode=Mode.PRIVATE)
    with BuildSketch(Plane(origin=(91.936542927, 106.928161863, 43), x_dir=(0.027495876610582105, 0, -0.999621916911297), z_dir=(0, 1, 0))) as chamfer_3_piece_22b_section:
        with BuildLine():
            Line((1.028673195, 0), (-0.056547155, 1.027117794))
            Line((-0.056547155, 1.027117794), (-0.076539593, 1.026567876))
            ThreePointArc((-0.076539593, 1.026567876), (-0.034129227, 0.51339783), (-0.019992438, -0.000549918))
            Line((-0.019992438, -0.000549918), (0.000549918, -0.019992438))
            ThreePointArc((0.000549918, -0.019992438), (0.514497665, -0.00585565), (1.029223113, -0.019992438))
            Line((1.029223113, -0.019992438), (1.028673195, 0))
        make_face()
    chamfer_3_piece_22b = extrude(amount=21.792078392, mode=Mode.PRIVATE)
    chamfer_3_piece_22b = split(chamfer_3_piece_22b, bisect_by=Plane(origin=(91.6067493, 126.148557267, 42.670206373), z_dir=(0, 1, 0)), keep=Keep.TOP, mode=Mode.PRIVATE)
    chamfer_3_piece_22 = chamfer_3_piece_22a & chamfer_3_piece_22b
    add(chamfer_3_piece_22, mode=Mode.SUBTRACT)
    with BuildSketch(Plane(origin=(91.936542927, 126.148557267, -5), x_dir=(0.02749587661058217, 0, 0.9996219169112968), z_dir=(0, -1, 0))) as chamfer_3_piece_23a_section:
        with BuildLine():
            Line((1.028673195, 0), (-0.056547155, 1.027117794))
            Line((-0.056547155, 1.027117794), (-0.076539593, 1.026567876))
            ThreePointArc((-0.076539593, 1.026567876), (-0.034129227, 0.51339783), (-0.019992438, -0.000549918))
            Line((-0.019992438, -0.000549918), (0.000549918, -0.019992438))
            ThreePointArc((0.000549918, -0.019992438), (0.514497665, -0.00585565), (1.029223113, -0.019992438))
            Line((1.029223113, -0.019992438), (1.028673195, 0))
        make_face()
    chamfer_3_piece_23a = extrude(amount=19.220395404, mode=Mode.PRIVATE)
    chamfer_3_piece_23a = split(chamfer_3_piece_23a, bisect_by=Plane(origin=(92.310865996, 109.003101361, -4.685176958), z_dir=(-0.7986355100472919, -0.6018150231520495, 0)), keep=Keep.TOP, mode=Mode.PRIVATE)
    with BuildSketch(Plane(origin=(90.38886547, 111.553682205, -5), x_dir=(-0.7983335594669051, -0.6015874870692681, -0.027495876610586504), z_dir=(0.6018150231520495, -0.7986355100472919, 0))) as chamfer_3_piece_23b_section:
        with BuildLine():
            Line((1.028673195, 0), (-0.056547155, -1.027117794))
            Line((-0.056547155, -1.027117794), (-0.076539593, -1.026567876))
            ThreePointArc((-0.076539593, -1.026567876), (-0.034129227, -0.51339783), (-0.019992438, 0.000549918))
            Line((-0.019992438, 0.000549918), (0.000549918, 0.019992438))
            ThreePointArc((0.000549918, 0.019992438), (0.514497665, 0.00585565), (1.029223113, 0.019992438))
            Line((1.029223113, 0.019992438), (1.028673195, 0))
        make_face()
    chamfer_3_piece_23b = extrude(amount=50.112937457, mode=Mode.PRIVATE)
    chamfer_3_piece_23b = split(chamfer_3_piece_23b, bisect_by=Plane(origin=(91.936542927, 110.121835087, -4.685176958), z_dir=(-1, 0, 0)), keep=Keep.TOP, mode=Mode.PRIVATE)
    chamfer_3_piece_23 = chamfer_3_piece_23a & chamfer_3_piece_23b
    add(chamfer_3_piece_23, mode=Mode.SUBTRACT)
    with BuildSketch(Plane(origin=(91.936542927, 139, 40.428317012), x_dir=(-0.999621916911297, 0.027495876610582292, 0), z_dir=(0, 0, 1))) as chamfer_3_piece_24a_section:
        with BuildLine():
            Line((1.028673195, 0), (-0.056547155, 1.027117794))
            Line((-0.056547155, 1.027117794), (-0.076539593, 1.026567876))
            ThreePointArc((-0.076539593, 1.026567876), (-0.034129227, 0.51339783), (-0.019992438, -0.000549918))
            Line((-0.019992438, -0.000549918), (0.000549918, -0.019992438))
            ThreePointArc((0.000549918, -0.019992438), (0.514497665, -0.00585565), (1.029223113, -0.019992438))
            Line((1.029223113, -0.019992438), (1.028673195, 0))
        make_face()
    chamfer_3_piece_24a = extrude(amount=9.643365976, mode=Mode.PRIVATE)
    chamfer_3_piece_24a = chamfer_3_piece_24a & Plane(origin=(91.606531136, 139, 19), x_dir=(0, 0, 1), z_dir=(1, 0, 0)) * Cylinder(24, 24, mode=Mode.PRIVATE)
    with BuildSketch(Plane(origin=(91.936542927, 139, 19), x_dir=(0, -0.10708445732496112, 0.9942499278347565), z_dir=(0, -0.9942499278347565, -0.10708445732496112))) as chamfer_3_piece_24b_section:
        with BuildLine():
            Line((22.971715729, -0.028284271), (24.028284271, 1.028284271))
            Line((24.028284271, 1.028284271), (24.048284271, 1.028284271))
            ThreePointArc((24.048284271, 1.028284271), (24.02, 0.514142136), (24.02, 0))
            Line((24.02, 0), (24, -0.02))
            ThreePointArc((24, -0.02), (23.485857864, -0.02), (22.971715729, -0.048284271))
            Line((22.971715729, -0.048284271), (22.971715729, -0.028284271))
        make_face()
    chamfer_3_piece_24b = revolve(axis=Axis((91.936542927, 139, 19), (-1, 0, 0)), revolution_arc=172.644248448, mode=Mode.PRIVATE)
    chamfer_3_piece_24b = split(chamfer_3_piece_24b, bisect_by=Plane(origin=(91.605315127, 139, 42.627498031), z_dir=(0, -1, 0)), keep=Keep.TOP, mode=Mode.PRIVATE)
    chamfer_3_piece_24 = chamfer_3_piece_24a & chamfer_3_piece_24b
    add(chamfer_3_piece_24, mode=Mode.SUBTRACT)
    with BuildSketch(Plane(origin=(91.936542927, 126.148557267, -13.071682988), x_dir=(0.02749587661058229, 0.9996219169112968, 0), z_dir=(0, 0, 1))) as chamfer_3_piece_25a_section:
        with BuildLine():
            Line((1.028673195, 0), (-0.056547155, 1.027117794))
            Line((-0.056547155, 1.027117794), (-0.076539593, 1.026567876))
            ThreePointArc((-0.076539593, 1.026567876), (-0.034129227, 0.51339783), (-0.019992438, -0.000549918))
            Line((-0.019992438, -0.000549918), (0.000549918, -0.019992438))
            ThreePointArc((0.000549918, -0.019992438), (0.514497665, -0.00585565), (1.029223113, -0.019992438))
            Line((1.029223113, -0.019992438), (1.028673195, 0))
        make_face()
    chamfer_3_piece_25a = extrude(amount=10.643365976, mode=Mode.PRIVATE)
    chamfer_3_piece_25a = split(chamfer_3_piece_25a, bisect_by=Plane(origin=(91.6067493, 126.478350893, -5), z_dir=(0, 0, 1)), keep=Keep.TOP, mode=Mode.PRIVATE)
    with BuildSketch(Plane(origin=(91.936542927, 128.720240255, -5), x_dir=(0.02749587661058217, 0, 0.9996219169112968), z_dir=(0, -1, 0))) as chamfer_3_piece_25b_section:
        with BuildLine():
            Line((1.028673195, 0), (-0.056547155, 1.027117794))
            Line((-0.056547155, 1.027117794), (-0.076539593, 1.026567876))
            ThreePointArc((-0.076539593, 1.026567876), (-0.034129227, 0.51339783), (-0.019992438, -0.000549918))
            Line((-0.019992438, -0.000549918), (0.000549918, -0.019992438))
            ThreePointArc((0.000549918, -0.019992438), (0.514497665, -0.00585565), (1.029223113, -0.019992438))
            Line((1.029223113, -0.019992438), (1.028673195, 0))
        make_face()
    chamfer_3_piece_25b = extrude(amount=21.792078392, mode=Mode.PRIVATE)
    chamfer_3_piece_25b = split(chamfer_3_piece_25b, bisect_by=Plane(origin=(91.6067493, 126.148557267, -4.670206373), z_dir=(0, 1, 0)), keep=Keep.TOP, mode=Mode.PRIVATE)
    chamfer_3_piece_25 = chamfer_3_piece_25a & chamfer_3_piece_25b
    add(chamfer_3_piece_25, mode=Mode.SUBTRACT)


solid = part.part
